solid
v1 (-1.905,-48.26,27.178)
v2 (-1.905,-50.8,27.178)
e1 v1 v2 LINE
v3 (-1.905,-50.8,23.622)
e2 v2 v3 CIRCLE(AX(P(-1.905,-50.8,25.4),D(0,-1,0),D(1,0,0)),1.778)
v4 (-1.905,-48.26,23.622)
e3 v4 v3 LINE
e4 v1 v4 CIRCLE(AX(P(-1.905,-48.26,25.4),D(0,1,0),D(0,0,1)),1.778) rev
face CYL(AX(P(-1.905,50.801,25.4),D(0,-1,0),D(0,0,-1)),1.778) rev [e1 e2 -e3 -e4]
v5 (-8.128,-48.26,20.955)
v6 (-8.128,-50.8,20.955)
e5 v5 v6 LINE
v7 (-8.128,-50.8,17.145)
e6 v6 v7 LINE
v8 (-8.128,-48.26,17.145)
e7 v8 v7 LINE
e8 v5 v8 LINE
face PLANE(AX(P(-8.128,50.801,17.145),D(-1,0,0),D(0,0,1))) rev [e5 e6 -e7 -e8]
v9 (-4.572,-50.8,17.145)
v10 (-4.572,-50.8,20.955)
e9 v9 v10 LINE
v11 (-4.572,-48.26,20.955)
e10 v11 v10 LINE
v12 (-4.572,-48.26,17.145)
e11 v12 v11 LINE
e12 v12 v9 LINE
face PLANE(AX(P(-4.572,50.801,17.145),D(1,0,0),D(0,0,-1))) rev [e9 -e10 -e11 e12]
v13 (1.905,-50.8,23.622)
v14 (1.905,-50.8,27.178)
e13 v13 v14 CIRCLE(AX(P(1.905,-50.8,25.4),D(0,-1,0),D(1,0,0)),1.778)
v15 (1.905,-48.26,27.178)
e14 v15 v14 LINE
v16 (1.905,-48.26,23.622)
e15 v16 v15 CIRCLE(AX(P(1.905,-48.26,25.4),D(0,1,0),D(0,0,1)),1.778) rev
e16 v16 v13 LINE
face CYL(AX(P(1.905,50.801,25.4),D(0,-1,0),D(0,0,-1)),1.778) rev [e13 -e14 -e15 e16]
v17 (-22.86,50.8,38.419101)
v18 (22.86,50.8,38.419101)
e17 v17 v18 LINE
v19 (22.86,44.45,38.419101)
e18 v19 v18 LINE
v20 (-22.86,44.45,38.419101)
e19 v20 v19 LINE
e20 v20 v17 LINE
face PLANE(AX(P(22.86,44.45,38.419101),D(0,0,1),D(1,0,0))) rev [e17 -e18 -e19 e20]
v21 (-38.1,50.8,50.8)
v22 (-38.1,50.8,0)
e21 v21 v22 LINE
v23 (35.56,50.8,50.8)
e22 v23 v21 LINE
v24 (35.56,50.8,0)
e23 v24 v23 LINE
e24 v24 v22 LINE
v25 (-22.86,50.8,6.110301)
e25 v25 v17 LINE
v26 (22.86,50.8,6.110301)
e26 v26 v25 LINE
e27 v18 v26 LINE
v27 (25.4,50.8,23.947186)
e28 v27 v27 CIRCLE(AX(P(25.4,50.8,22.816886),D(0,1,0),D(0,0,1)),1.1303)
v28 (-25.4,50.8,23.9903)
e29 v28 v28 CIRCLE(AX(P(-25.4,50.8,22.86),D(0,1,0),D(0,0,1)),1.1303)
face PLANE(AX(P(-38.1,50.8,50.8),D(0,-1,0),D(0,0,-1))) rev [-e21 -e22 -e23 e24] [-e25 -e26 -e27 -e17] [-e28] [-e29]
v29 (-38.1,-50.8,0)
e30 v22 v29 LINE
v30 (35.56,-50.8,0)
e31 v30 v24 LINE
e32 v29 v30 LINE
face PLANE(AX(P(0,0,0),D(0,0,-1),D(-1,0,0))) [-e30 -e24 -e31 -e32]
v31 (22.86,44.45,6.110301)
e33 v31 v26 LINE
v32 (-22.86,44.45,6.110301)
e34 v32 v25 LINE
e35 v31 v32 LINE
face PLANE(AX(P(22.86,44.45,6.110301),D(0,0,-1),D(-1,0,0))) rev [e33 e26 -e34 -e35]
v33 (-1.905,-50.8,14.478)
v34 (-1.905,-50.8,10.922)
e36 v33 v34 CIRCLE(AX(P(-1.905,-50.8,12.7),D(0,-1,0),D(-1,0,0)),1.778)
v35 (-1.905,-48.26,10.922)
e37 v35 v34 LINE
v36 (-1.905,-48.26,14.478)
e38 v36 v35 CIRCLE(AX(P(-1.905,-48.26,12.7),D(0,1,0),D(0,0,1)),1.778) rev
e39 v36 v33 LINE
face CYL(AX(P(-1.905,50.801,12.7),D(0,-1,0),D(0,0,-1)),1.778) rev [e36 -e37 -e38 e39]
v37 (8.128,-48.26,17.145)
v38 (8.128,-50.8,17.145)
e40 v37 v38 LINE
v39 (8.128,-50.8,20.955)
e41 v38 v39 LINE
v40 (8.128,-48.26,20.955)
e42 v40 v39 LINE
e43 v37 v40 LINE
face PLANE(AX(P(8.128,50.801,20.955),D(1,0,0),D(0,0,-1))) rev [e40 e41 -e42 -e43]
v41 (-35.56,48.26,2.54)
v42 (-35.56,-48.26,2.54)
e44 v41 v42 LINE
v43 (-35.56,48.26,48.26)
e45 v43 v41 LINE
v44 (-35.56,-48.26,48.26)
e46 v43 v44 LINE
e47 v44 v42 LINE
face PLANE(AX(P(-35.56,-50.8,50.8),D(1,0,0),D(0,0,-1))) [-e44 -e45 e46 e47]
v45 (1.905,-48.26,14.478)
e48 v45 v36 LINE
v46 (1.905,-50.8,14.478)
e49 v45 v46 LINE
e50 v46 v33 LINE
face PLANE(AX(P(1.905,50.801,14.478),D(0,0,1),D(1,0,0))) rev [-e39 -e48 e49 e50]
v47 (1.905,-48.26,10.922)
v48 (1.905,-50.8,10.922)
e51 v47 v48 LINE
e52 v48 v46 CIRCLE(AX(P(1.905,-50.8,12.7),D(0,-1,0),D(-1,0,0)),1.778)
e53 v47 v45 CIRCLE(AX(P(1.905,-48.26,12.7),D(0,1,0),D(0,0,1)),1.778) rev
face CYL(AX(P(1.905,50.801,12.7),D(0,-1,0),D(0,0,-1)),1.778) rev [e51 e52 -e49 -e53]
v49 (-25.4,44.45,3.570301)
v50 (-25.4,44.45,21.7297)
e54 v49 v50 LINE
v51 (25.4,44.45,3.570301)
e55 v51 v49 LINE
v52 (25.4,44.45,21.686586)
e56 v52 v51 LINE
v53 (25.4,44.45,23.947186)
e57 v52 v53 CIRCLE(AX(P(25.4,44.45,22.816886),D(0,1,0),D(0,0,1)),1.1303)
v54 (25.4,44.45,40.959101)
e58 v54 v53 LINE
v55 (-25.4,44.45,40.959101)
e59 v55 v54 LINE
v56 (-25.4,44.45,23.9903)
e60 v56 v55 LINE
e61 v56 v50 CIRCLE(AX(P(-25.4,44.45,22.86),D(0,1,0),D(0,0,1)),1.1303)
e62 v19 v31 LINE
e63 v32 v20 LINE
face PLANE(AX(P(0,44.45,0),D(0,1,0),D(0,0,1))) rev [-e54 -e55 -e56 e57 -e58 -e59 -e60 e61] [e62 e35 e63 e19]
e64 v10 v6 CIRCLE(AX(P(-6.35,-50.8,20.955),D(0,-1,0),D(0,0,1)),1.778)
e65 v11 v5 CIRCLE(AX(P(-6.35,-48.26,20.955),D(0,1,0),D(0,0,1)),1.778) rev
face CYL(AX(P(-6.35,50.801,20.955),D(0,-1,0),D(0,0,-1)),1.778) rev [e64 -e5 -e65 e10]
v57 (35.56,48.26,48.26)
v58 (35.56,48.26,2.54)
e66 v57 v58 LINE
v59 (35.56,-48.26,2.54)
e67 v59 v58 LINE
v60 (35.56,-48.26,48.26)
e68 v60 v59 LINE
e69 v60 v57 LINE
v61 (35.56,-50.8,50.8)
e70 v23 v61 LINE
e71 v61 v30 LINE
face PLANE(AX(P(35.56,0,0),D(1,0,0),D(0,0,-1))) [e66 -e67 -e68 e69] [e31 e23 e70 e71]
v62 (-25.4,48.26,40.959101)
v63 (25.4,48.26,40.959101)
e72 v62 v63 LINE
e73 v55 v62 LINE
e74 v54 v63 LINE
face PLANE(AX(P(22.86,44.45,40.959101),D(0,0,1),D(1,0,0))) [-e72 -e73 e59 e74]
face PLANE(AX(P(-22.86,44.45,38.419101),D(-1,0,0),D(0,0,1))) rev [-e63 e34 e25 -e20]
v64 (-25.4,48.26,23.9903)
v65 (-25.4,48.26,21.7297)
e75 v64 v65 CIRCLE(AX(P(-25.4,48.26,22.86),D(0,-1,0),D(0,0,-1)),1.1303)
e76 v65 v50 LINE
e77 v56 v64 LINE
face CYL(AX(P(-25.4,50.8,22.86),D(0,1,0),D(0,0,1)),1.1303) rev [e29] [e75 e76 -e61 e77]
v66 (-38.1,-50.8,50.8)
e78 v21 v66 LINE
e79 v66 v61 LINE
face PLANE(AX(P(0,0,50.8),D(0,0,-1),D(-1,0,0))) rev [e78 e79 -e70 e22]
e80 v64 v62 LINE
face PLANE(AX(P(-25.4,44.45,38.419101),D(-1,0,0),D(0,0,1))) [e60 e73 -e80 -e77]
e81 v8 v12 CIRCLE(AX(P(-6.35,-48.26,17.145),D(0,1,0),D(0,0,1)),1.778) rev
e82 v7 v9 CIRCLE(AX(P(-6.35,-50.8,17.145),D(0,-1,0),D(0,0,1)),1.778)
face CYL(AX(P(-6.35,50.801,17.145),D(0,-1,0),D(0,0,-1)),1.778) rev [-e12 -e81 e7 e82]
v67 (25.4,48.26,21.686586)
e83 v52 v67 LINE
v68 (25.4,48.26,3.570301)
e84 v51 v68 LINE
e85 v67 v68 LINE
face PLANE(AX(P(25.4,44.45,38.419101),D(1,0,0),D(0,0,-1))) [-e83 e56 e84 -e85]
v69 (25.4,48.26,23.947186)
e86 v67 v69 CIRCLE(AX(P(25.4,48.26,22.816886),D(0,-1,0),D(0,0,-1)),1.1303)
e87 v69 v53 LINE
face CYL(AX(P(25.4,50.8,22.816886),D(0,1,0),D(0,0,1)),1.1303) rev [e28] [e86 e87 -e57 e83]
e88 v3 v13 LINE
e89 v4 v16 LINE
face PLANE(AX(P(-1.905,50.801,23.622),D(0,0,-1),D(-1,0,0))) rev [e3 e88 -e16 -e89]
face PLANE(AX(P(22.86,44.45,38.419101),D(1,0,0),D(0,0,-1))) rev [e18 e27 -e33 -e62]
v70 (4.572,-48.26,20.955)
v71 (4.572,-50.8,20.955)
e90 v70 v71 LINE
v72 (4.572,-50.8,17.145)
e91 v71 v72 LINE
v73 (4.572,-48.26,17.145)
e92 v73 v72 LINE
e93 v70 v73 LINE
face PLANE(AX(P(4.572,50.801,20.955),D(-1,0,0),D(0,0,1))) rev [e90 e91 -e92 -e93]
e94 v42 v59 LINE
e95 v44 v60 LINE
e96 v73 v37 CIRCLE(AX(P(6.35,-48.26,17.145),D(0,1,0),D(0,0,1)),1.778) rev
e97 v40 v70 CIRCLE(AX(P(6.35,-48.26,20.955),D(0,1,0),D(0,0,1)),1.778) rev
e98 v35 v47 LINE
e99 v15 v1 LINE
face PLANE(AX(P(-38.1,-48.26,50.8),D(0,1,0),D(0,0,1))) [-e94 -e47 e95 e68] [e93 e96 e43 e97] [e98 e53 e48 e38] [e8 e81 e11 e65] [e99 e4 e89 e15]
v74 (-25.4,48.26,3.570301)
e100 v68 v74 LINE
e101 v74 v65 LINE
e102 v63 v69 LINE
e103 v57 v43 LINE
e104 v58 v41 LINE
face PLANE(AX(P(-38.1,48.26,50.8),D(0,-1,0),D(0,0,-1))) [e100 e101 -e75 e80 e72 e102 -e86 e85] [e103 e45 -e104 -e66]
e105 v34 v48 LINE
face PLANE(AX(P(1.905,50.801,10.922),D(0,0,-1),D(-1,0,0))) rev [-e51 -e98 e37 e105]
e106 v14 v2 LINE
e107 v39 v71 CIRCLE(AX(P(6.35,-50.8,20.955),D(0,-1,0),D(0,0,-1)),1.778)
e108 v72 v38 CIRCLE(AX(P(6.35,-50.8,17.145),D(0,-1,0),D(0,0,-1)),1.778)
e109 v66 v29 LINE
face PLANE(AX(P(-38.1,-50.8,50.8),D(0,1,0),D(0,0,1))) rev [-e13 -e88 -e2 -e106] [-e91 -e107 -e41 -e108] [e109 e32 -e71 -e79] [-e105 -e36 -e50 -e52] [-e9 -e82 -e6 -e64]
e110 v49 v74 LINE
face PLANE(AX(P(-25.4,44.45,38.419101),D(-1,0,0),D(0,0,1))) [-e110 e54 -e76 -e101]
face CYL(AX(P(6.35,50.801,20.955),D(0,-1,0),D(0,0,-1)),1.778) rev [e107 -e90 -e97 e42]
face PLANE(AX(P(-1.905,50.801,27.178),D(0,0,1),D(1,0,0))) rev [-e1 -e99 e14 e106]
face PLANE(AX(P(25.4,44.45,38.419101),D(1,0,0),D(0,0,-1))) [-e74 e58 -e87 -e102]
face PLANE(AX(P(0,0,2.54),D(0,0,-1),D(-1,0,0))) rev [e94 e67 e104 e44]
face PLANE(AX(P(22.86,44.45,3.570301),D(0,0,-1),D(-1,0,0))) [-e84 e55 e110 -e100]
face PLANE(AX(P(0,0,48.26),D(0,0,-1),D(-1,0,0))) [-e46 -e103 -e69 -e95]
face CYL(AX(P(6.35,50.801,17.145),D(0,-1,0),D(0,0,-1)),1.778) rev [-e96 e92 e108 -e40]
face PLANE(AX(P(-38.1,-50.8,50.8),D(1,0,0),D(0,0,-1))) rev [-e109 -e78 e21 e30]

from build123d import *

# Parameters (mm, degrees)
SKETCH1_W                    = 76.2
SKETCH1_H                    = 101.6
BODY_DEPTH                   = 50.8
SKETCH2_W                    = 45.72
SKETCH2_H                    = 32.3088
CAMERA_HOLE_DEPTH            = 6.35
HOLLOW_START                 = -35.56
HOLLOW_DEPTH                 = 71.12
HOLLOW_2_OUTLINE_W           = 3.81
HOLLOW_2_OUTLINE_H           = 37.3888
HOLLOW_2_DEPTH               = 10.16
HOLLOW_START_2               = 25.4
HOLLOW_3_OUTLINE_W           = 3.81
HOLLOW_3_OUTLINE_H           = 37.3888
HOLLOW_3_DEPTH               = 10.16
SINGLE_BUTTON_LEG_HOLE_REACH = 121.812
ALL_BUTTON_HOLES_COUNT       = 4
SKETCH5_W                    = 50.8
SKETCH5_H                    = 101.6
LET_FOLKS_SEE_IN_DEPTH       = 2.54
F_4_40_TAPPED_HOLE1_D        = 2.2606
F_4_40_TAPPED_HOLE1_DEPTH    = 7.62
F_4_40_TAPPED_HOLE1_TIP      = 0.679152758


# Read off the part's stored shape, not the designer's step: hollow
with BuildPart() as part:
    # Sketch1 → body (new body)
    with BuildSketch(Plane.XY):
        Rectangle(SKETCH1_W, SKETCH1_H)
    extrude(amount=BODY_DEPTH)

    # Sketch2 → camera hole (cut)
    with BuildSketch(Plane(origin=(0, 50.8, 0), x_dir=(1, 0, 0), z_dir=(0, 1, 0))):
        with Locations((0, -22.264701422)):
            Rectangle(SKETCH2_W, SKETCH2_H)
    extrude(amount=-CAMERA_HOLE_DEPTH, mode=Mode.SUBTRACT)

    # hollow outline → hollow (cut)
    with BuildSketch(Plane.YZ.offset(HOLLOW_START)):
        Polygon((48.26, 40.959101422), (48.26, 48.26), (-48.26, 48.26), (-48.26, 2.54), (48.26, 2.54), (48.26, 3.570301422), (44.45, 3.570301422), (44.45, 40.959101422), align=None)
    extrude(amount=HOLLOW_DEPTH, mode=Mode.SUBTRACT)

    # hollow 2 outline → hollow 2 (cut)
    with BuildSketch(Plane.YZ.offset(HOLLOW_START)):
        with Locations((46.355, 22.264701422)):
            Rectangle(HOLLOW_2_OUTLINE_W, HOLLOW_2_OUTLINE_H)
    extrude(amount=HOLLOW_2_DEPTH, mode=Mode.SUBTRACT)

    # hollow 3 outline → hollow 3 (cut)
    with BuildSketch(Plane.YZ.offset(HOLLOW_START_2)):
        with Locations((46.355, 22.264701422)):
            Rectangle(HOLLOW_3_OUTLINE_W, HOLLOW_3_OUTLINE_H)
    extrude(amount=HOLLOW_3_DEPTH, mode=Mode.SUBTRACT)

    # Sketch4 → single button leg hole (cut, up to next)
    with BuildSketch(Plane.XZ.offset(50.8), mode=Mode.PRIVATE) as single_button_leg_hole_sk1:
        with BuildLine():
            Line((8.128, 20.955), (8.128, 17.145))
            ThreePointArc((8.128, 17.145), (6.35, 15.367), (4.572, 17.145))
            Line((4.572, 17.145), (4.572, 20.955))
            ThreePointArc((4.572, 20.955), (6.35, 22.733), (8.128, 20.955))
        make_face()
    single_button_leg_hole_tool1 = extrude(single_button_leg_hole_sk1.sketch, amount=-SINGLE_BUTTON_LEG_HOLE_REACH, mode=Mode.PRIVATE) & part.part
    single_button_leg_hole = single_button_leg_hole_tool1.solids().sort_by_distance((6.35, -50.8, 19.05))[0]
    add(single_button_leg_hole, mode=Mode.SUBTRACT)

    # all button holes: single button leg hole ×4 about axis
    all_button_holes_axis = Axis((0, 0, 19.05), (0, 1, 0))
    for i in range(1, ALL_BUTTON_HOLES_COUNT):
        add(single_button_leg_hole.rotate(all_button_holes_axis, i * 360 / ALL_BUTTON_HOLES_COUNT), mode=Mode.SUBTRACT)

    # Sketch5 → let folks see in (cut)
    with BuildSketch(Plane(origin=(38.1, 0, 0), x_dir=(0, 0, -1), z_dir=(1, 0, 0))):
        with Locations((-25.4, 0)):
            Rectangle(SKETCH5_W, SKETCH5_H)
    extrude(amount=-LET_FOLKS_SEE_IN_DEPTH, mode=Mode.SUBTRACT)

    # #4-40 Tapped Hole1
    with Locations(Plane(origin=(0, 50.8, 0), x_dir=(1, 0, 0), z_dir=(0, 1, 0))):
        with Locations((-25.4, -22.86), (25.4, -22.816885961)):
            Hole(F_4_40_TAPPED_HOLE1_D / 2, depth=F_4_40_TAPPED_HOLE1_DEPTH)
            with Locations((0, 0, -(F_4_40_TAPPED_HOLE1_DEPTH + F_4_40_TAPPED_HOLE1_TIP / 2))):  # 118° drill point
                Cone(0, F_4_40_TAPPED_HOLE1_D / 2, F_4_40_TAPPED_HOLE1_TIP, mode=Mode.SUBTRACT)


solid = part.part
